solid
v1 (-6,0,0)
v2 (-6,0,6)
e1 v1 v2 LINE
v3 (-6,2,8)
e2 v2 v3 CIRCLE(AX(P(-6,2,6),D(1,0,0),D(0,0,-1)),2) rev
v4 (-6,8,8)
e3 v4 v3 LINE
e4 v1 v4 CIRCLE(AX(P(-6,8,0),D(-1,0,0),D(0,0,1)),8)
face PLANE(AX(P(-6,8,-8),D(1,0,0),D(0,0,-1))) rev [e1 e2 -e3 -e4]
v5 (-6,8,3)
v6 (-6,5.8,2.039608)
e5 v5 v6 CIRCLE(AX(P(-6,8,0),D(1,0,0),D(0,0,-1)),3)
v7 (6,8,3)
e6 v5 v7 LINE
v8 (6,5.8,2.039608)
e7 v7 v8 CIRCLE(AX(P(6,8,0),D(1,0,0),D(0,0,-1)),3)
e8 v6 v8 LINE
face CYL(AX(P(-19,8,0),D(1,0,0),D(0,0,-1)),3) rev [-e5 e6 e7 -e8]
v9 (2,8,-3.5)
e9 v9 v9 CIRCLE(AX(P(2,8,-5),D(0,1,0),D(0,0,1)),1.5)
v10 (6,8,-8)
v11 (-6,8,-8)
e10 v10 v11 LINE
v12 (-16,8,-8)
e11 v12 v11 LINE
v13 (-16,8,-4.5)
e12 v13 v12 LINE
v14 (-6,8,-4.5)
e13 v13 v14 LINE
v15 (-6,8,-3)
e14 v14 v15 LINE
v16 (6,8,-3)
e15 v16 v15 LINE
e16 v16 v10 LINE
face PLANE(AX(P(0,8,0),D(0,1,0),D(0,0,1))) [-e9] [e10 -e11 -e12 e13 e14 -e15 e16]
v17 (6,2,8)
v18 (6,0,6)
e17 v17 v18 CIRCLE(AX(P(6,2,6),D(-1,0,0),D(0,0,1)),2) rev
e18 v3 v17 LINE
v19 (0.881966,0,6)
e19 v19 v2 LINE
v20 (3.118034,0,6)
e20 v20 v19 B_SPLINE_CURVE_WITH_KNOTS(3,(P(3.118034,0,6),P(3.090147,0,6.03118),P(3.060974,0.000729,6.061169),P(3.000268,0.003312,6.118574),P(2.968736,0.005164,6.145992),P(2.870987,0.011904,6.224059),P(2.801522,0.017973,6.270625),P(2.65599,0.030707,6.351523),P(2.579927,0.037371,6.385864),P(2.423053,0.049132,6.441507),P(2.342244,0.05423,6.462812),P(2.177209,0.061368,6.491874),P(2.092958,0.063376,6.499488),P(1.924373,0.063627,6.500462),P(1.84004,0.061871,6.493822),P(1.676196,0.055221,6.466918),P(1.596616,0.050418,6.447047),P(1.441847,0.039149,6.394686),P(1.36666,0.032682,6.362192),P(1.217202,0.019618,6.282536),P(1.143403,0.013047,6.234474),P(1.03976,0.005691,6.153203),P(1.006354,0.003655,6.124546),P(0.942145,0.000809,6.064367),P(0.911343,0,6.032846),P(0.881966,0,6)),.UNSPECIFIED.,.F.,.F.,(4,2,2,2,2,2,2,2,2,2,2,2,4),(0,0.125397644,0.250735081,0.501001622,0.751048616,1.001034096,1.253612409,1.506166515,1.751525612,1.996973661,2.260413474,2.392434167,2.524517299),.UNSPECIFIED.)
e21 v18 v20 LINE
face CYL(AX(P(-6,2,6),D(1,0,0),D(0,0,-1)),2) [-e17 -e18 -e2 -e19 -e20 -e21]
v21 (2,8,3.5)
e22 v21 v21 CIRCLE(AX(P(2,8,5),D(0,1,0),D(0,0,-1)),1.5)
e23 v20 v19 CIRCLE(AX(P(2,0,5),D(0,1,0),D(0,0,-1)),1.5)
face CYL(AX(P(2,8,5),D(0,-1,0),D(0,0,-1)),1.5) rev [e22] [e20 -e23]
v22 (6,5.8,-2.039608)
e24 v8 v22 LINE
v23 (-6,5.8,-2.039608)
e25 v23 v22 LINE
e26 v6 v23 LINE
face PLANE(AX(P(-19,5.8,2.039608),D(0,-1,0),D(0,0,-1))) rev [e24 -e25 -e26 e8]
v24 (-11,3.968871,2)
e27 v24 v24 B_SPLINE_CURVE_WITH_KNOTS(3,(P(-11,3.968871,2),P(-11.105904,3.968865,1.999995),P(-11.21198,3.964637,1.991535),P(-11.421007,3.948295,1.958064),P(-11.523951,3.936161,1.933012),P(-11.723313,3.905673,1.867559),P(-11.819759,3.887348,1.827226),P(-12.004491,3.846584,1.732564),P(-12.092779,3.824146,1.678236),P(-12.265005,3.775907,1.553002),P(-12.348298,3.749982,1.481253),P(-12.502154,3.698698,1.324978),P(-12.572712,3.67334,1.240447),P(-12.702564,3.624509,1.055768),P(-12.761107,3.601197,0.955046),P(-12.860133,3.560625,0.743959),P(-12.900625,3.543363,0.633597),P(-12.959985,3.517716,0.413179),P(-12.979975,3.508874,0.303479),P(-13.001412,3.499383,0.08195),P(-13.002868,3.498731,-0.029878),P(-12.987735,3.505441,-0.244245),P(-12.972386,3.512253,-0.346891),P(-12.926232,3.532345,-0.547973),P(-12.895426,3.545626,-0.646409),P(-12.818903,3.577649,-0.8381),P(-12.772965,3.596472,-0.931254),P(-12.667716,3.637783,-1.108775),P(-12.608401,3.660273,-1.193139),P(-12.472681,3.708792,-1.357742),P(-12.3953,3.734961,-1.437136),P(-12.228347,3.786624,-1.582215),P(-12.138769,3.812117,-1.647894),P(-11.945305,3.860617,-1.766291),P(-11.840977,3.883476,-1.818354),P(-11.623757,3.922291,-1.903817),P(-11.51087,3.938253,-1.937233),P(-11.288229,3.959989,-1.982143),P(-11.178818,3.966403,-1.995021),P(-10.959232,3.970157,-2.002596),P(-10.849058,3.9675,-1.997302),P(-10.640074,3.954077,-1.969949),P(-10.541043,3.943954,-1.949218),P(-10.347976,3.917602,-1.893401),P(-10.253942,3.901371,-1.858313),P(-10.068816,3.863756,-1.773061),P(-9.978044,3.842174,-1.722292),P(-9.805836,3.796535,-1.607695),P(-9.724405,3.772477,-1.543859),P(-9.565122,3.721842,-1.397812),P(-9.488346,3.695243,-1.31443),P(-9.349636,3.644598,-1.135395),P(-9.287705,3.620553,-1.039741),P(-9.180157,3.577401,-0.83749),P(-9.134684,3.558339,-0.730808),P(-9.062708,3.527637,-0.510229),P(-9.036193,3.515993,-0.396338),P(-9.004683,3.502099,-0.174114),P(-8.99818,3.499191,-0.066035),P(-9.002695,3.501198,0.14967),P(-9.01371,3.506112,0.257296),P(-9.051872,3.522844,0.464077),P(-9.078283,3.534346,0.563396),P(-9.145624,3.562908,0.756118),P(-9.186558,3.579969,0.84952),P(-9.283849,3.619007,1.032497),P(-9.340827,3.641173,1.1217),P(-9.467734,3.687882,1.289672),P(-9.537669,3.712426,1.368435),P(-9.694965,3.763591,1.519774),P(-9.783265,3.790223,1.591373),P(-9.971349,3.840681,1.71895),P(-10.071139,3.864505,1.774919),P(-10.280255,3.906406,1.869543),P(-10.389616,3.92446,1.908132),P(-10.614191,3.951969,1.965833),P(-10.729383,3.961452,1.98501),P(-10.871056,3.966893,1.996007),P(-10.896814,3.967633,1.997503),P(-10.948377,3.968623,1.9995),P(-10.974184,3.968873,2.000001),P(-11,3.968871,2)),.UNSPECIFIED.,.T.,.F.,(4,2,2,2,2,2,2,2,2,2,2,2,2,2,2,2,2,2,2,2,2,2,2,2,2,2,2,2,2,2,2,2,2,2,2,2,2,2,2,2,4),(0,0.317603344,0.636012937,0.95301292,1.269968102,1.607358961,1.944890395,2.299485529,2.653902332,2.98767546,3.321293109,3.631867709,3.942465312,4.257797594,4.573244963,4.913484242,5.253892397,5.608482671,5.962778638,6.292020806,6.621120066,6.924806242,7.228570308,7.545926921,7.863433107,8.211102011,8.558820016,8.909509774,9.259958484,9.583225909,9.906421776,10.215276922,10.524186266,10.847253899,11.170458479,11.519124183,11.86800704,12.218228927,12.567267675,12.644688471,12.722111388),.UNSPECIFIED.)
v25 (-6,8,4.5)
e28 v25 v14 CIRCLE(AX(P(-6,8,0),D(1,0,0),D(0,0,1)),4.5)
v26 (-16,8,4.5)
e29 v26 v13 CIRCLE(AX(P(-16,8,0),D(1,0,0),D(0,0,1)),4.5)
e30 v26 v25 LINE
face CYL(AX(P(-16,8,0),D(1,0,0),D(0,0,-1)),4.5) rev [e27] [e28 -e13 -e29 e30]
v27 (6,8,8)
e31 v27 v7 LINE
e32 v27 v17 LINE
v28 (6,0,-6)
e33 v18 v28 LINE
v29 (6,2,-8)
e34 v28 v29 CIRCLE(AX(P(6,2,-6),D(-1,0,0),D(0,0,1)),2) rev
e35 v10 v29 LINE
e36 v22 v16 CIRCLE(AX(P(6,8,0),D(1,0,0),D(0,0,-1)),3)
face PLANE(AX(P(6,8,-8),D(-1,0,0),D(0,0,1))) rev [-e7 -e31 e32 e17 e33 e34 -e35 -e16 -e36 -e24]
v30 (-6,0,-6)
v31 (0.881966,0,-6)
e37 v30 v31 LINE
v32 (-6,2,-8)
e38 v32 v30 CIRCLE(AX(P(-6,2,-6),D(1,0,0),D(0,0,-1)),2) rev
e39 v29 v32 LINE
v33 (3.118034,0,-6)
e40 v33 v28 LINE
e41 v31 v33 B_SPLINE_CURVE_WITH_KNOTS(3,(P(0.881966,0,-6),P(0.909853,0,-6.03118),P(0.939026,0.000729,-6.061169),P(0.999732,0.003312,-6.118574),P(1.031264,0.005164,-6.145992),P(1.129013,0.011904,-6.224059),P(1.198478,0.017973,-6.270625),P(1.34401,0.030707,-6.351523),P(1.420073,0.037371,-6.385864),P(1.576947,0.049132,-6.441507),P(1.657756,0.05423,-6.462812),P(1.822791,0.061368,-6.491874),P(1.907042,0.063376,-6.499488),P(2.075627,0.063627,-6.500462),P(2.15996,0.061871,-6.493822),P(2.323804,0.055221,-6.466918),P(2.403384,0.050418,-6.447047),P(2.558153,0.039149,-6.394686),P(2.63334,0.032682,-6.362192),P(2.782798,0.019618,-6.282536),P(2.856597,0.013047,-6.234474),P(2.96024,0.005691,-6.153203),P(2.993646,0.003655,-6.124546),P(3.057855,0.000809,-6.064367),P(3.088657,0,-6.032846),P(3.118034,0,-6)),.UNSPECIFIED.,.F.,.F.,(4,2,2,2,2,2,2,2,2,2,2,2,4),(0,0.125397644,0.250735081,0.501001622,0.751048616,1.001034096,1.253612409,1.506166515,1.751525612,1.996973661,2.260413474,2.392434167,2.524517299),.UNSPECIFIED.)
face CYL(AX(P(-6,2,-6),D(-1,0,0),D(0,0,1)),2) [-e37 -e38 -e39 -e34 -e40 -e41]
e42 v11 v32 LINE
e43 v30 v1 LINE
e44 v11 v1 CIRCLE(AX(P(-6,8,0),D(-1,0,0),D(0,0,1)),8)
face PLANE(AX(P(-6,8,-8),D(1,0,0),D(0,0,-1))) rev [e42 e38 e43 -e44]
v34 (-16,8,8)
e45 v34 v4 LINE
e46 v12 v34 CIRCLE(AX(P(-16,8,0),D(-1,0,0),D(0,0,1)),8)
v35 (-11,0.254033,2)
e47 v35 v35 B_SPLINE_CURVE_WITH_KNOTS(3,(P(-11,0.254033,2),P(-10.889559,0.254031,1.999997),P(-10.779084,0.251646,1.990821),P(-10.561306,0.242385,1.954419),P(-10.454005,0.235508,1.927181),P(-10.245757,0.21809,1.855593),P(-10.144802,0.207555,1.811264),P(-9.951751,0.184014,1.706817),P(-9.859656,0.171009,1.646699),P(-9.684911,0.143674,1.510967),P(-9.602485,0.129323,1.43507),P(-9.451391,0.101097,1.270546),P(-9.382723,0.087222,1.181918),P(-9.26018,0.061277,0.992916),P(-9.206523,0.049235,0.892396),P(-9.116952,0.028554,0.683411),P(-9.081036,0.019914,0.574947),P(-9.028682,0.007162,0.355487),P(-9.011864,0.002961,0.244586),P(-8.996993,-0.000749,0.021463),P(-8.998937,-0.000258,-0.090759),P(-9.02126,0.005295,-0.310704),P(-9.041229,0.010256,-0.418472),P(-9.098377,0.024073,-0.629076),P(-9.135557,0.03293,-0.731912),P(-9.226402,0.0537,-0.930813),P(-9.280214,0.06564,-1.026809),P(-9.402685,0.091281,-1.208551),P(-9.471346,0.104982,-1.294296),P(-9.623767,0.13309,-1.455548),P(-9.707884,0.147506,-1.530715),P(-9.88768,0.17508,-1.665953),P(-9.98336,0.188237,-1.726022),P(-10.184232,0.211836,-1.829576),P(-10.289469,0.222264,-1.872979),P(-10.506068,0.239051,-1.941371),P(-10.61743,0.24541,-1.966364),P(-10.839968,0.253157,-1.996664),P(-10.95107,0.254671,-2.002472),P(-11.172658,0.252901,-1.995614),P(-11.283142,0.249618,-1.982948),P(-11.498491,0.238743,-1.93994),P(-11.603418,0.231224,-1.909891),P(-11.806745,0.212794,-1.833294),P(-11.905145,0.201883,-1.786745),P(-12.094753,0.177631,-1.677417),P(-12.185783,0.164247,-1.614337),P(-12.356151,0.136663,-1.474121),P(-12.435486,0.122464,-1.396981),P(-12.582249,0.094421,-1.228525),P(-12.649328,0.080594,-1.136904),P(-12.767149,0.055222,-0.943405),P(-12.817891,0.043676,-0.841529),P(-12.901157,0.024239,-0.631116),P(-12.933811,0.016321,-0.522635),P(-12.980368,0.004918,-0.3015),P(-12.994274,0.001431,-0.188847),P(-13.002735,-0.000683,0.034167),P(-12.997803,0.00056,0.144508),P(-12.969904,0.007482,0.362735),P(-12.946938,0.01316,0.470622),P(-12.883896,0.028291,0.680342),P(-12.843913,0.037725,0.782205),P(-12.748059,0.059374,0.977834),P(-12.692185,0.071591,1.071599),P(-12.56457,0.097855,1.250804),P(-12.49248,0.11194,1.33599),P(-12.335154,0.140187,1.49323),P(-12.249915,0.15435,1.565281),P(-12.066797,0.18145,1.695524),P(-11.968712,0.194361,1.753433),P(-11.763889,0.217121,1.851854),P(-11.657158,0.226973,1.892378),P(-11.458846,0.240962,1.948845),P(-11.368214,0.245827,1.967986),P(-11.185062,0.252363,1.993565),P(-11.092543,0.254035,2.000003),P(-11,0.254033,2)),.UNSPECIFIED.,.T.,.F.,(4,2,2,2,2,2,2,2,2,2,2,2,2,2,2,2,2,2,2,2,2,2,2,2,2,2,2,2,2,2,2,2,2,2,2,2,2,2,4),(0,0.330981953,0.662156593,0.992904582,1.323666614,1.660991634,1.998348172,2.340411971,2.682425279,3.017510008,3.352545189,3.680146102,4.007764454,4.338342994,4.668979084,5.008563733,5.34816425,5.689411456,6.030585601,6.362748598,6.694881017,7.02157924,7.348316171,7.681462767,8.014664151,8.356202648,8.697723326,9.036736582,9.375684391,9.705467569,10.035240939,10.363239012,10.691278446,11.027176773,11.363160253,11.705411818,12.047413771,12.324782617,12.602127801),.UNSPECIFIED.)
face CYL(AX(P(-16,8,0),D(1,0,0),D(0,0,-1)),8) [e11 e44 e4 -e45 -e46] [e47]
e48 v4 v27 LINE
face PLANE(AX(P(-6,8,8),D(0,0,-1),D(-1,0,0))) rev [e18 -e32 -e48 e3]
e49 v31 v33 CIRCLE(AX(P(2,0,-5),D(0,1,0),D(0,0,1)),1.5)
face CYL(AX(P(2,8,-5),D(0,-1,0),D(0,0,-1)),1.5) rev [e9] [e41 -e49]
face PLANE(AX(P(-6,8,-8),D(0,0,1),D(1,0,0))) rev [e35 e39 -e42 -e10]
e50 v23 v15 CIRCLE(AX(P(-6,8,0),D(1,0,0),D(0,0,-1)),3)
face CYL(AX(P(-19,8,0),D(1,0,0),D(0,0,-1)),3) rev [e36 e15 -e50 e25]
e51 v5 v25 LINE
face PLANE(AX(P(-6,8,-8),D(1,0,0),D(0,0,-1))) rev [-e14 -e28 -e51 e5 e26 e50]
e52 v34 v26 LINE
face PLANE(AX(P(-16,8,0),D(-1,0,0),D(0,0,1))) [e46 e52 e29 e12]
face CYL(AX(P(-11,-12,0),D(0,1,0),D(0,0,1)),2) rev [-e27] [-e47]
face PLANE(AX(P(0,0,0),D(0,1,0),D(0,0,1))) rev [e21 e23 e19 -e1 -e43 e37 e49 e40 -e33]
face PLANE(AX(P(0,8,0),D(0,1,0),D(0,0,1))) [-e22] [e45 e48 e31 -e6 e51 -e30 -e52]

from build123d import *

# Parameters (mm, degrees)
SKETCH_1_W          = 12
SKETCH_1_H          = 16
SKETCH_1_R          = 1.5
EXTRUDE_1_DEPTH     = 8
CUT_EXTRUDE_1_DEPTH = 25
EXTRUDE_2_DEPTH     = 10
FILLET_1_R          = 2
SKETCH_4_R          = 2
CUT_EXTRUDE_2_DEPTH = 20


with BuildPart() as part:
    # 草图1 → 凸台-拉伸1 (new body)
    with BuildSketch(Plane(origin=(0, 0, 0), x_dir=(1, 0, 0), z_dir=(0, 1, 0))):
        Rectangle(SKETCH_1_W, SKETCH_1_H)
        with Locations(Location((2, 5, 0), (0, 0, 270))):
            Circle(SKETCH_1_R, mode=Mode.SUBTRACT)
        with Locations(Location((2, -5, 0), (0, 0, 90))):
            Circle(SKETCH_1_R, mode=Mode.SUBTRACT)
    extrude(amount=EXTRUDE_1_DEPTH)

    # 草图2 → 切除-拉伸1 (cut)
    with BuildSketch(Plane(origin=(6, 0, 0), x_dir=(0, 0, -1), z_dir=(1, 0, 0))):
        with BuildLine():
            Line((-2.039607805, 5.8), (2.039607805, 5.8))
            ThreePointArc((2.039607805, 5.8), (0, 11), (-2.039607805, 5.8))
        make_face()
    extrude(amount=-CUT_EXTRUDE_1_DEPTH, mode=Mode.SUBTRACT)

    # 草图3 → 凸台-拉伸2 (add)
    with BuildSketch(Plane.ZY.offset(6)):
        with BuildLine():
            Line((-8, 8), (-4.5, 8))
            ThreePointArc((-4.5, 8), (0, 3.5), (4.5, 8))
            Line((4.5, 8), (8, 8))
            ThreePointArc((8, 8), (0, 0), (-8, 8))
        make_face()
    extrude(amount=EXTRUDE_2_DEPTH)

    # 圆角1
    # the kernel refuses this fillet: 2 mm, written as the material it takes off along each edge
    with BuildSketch(Plane(origin=(11, 0, 8), x_dir=(0, 0, -1), z_dir=(-1, 0, 0))) as fillet_1_piece_1:
        with BuildLine():
            CenterArc((FILLET_1_R, -FILLET_1_R), FILLET_1_R, 90, 90)
            Line((0, -FILLET_1_R), (0, 0))
            Line((0, 0), (FILLET_1_R, 0))
        make_face()
    extrude(amount=22, mode=Mode.SUBTRACT)
    with BuildSketch(Plane(origin=(-11, 0, -8), x_dir=(0, 1, 0), z_dir=(1, 0, 0))) as fillet_1_piece_2:
        with BuildLine():
            CenterArc((FILLET_1_R, FILLET_1_R), FILLET_1_R, 180, 90)
            Line((0, FILLET_1_R), (0, 0))
            Line((0, 0), (FILLET_1_R, 0))
        make_face()
    extrude(amount=22, mode=Mode.SUBTRACT)

    # 草图4 → 切除-拉伸2 (cut)
    with BuildSketch(Plane(origin=(0, 8, 0), x_dir=(1, 0, 0), z_dir=(0, 1, 0))):
        with Locations(Location((-11, 0, 0), (0, 0, 270))):
            Circle(SKETCH_4_R)
    extrude(amount=-CUT_EXTRUDE_2_DEPTH, mode=Mode.SUBTRACT)


solid = part.part
